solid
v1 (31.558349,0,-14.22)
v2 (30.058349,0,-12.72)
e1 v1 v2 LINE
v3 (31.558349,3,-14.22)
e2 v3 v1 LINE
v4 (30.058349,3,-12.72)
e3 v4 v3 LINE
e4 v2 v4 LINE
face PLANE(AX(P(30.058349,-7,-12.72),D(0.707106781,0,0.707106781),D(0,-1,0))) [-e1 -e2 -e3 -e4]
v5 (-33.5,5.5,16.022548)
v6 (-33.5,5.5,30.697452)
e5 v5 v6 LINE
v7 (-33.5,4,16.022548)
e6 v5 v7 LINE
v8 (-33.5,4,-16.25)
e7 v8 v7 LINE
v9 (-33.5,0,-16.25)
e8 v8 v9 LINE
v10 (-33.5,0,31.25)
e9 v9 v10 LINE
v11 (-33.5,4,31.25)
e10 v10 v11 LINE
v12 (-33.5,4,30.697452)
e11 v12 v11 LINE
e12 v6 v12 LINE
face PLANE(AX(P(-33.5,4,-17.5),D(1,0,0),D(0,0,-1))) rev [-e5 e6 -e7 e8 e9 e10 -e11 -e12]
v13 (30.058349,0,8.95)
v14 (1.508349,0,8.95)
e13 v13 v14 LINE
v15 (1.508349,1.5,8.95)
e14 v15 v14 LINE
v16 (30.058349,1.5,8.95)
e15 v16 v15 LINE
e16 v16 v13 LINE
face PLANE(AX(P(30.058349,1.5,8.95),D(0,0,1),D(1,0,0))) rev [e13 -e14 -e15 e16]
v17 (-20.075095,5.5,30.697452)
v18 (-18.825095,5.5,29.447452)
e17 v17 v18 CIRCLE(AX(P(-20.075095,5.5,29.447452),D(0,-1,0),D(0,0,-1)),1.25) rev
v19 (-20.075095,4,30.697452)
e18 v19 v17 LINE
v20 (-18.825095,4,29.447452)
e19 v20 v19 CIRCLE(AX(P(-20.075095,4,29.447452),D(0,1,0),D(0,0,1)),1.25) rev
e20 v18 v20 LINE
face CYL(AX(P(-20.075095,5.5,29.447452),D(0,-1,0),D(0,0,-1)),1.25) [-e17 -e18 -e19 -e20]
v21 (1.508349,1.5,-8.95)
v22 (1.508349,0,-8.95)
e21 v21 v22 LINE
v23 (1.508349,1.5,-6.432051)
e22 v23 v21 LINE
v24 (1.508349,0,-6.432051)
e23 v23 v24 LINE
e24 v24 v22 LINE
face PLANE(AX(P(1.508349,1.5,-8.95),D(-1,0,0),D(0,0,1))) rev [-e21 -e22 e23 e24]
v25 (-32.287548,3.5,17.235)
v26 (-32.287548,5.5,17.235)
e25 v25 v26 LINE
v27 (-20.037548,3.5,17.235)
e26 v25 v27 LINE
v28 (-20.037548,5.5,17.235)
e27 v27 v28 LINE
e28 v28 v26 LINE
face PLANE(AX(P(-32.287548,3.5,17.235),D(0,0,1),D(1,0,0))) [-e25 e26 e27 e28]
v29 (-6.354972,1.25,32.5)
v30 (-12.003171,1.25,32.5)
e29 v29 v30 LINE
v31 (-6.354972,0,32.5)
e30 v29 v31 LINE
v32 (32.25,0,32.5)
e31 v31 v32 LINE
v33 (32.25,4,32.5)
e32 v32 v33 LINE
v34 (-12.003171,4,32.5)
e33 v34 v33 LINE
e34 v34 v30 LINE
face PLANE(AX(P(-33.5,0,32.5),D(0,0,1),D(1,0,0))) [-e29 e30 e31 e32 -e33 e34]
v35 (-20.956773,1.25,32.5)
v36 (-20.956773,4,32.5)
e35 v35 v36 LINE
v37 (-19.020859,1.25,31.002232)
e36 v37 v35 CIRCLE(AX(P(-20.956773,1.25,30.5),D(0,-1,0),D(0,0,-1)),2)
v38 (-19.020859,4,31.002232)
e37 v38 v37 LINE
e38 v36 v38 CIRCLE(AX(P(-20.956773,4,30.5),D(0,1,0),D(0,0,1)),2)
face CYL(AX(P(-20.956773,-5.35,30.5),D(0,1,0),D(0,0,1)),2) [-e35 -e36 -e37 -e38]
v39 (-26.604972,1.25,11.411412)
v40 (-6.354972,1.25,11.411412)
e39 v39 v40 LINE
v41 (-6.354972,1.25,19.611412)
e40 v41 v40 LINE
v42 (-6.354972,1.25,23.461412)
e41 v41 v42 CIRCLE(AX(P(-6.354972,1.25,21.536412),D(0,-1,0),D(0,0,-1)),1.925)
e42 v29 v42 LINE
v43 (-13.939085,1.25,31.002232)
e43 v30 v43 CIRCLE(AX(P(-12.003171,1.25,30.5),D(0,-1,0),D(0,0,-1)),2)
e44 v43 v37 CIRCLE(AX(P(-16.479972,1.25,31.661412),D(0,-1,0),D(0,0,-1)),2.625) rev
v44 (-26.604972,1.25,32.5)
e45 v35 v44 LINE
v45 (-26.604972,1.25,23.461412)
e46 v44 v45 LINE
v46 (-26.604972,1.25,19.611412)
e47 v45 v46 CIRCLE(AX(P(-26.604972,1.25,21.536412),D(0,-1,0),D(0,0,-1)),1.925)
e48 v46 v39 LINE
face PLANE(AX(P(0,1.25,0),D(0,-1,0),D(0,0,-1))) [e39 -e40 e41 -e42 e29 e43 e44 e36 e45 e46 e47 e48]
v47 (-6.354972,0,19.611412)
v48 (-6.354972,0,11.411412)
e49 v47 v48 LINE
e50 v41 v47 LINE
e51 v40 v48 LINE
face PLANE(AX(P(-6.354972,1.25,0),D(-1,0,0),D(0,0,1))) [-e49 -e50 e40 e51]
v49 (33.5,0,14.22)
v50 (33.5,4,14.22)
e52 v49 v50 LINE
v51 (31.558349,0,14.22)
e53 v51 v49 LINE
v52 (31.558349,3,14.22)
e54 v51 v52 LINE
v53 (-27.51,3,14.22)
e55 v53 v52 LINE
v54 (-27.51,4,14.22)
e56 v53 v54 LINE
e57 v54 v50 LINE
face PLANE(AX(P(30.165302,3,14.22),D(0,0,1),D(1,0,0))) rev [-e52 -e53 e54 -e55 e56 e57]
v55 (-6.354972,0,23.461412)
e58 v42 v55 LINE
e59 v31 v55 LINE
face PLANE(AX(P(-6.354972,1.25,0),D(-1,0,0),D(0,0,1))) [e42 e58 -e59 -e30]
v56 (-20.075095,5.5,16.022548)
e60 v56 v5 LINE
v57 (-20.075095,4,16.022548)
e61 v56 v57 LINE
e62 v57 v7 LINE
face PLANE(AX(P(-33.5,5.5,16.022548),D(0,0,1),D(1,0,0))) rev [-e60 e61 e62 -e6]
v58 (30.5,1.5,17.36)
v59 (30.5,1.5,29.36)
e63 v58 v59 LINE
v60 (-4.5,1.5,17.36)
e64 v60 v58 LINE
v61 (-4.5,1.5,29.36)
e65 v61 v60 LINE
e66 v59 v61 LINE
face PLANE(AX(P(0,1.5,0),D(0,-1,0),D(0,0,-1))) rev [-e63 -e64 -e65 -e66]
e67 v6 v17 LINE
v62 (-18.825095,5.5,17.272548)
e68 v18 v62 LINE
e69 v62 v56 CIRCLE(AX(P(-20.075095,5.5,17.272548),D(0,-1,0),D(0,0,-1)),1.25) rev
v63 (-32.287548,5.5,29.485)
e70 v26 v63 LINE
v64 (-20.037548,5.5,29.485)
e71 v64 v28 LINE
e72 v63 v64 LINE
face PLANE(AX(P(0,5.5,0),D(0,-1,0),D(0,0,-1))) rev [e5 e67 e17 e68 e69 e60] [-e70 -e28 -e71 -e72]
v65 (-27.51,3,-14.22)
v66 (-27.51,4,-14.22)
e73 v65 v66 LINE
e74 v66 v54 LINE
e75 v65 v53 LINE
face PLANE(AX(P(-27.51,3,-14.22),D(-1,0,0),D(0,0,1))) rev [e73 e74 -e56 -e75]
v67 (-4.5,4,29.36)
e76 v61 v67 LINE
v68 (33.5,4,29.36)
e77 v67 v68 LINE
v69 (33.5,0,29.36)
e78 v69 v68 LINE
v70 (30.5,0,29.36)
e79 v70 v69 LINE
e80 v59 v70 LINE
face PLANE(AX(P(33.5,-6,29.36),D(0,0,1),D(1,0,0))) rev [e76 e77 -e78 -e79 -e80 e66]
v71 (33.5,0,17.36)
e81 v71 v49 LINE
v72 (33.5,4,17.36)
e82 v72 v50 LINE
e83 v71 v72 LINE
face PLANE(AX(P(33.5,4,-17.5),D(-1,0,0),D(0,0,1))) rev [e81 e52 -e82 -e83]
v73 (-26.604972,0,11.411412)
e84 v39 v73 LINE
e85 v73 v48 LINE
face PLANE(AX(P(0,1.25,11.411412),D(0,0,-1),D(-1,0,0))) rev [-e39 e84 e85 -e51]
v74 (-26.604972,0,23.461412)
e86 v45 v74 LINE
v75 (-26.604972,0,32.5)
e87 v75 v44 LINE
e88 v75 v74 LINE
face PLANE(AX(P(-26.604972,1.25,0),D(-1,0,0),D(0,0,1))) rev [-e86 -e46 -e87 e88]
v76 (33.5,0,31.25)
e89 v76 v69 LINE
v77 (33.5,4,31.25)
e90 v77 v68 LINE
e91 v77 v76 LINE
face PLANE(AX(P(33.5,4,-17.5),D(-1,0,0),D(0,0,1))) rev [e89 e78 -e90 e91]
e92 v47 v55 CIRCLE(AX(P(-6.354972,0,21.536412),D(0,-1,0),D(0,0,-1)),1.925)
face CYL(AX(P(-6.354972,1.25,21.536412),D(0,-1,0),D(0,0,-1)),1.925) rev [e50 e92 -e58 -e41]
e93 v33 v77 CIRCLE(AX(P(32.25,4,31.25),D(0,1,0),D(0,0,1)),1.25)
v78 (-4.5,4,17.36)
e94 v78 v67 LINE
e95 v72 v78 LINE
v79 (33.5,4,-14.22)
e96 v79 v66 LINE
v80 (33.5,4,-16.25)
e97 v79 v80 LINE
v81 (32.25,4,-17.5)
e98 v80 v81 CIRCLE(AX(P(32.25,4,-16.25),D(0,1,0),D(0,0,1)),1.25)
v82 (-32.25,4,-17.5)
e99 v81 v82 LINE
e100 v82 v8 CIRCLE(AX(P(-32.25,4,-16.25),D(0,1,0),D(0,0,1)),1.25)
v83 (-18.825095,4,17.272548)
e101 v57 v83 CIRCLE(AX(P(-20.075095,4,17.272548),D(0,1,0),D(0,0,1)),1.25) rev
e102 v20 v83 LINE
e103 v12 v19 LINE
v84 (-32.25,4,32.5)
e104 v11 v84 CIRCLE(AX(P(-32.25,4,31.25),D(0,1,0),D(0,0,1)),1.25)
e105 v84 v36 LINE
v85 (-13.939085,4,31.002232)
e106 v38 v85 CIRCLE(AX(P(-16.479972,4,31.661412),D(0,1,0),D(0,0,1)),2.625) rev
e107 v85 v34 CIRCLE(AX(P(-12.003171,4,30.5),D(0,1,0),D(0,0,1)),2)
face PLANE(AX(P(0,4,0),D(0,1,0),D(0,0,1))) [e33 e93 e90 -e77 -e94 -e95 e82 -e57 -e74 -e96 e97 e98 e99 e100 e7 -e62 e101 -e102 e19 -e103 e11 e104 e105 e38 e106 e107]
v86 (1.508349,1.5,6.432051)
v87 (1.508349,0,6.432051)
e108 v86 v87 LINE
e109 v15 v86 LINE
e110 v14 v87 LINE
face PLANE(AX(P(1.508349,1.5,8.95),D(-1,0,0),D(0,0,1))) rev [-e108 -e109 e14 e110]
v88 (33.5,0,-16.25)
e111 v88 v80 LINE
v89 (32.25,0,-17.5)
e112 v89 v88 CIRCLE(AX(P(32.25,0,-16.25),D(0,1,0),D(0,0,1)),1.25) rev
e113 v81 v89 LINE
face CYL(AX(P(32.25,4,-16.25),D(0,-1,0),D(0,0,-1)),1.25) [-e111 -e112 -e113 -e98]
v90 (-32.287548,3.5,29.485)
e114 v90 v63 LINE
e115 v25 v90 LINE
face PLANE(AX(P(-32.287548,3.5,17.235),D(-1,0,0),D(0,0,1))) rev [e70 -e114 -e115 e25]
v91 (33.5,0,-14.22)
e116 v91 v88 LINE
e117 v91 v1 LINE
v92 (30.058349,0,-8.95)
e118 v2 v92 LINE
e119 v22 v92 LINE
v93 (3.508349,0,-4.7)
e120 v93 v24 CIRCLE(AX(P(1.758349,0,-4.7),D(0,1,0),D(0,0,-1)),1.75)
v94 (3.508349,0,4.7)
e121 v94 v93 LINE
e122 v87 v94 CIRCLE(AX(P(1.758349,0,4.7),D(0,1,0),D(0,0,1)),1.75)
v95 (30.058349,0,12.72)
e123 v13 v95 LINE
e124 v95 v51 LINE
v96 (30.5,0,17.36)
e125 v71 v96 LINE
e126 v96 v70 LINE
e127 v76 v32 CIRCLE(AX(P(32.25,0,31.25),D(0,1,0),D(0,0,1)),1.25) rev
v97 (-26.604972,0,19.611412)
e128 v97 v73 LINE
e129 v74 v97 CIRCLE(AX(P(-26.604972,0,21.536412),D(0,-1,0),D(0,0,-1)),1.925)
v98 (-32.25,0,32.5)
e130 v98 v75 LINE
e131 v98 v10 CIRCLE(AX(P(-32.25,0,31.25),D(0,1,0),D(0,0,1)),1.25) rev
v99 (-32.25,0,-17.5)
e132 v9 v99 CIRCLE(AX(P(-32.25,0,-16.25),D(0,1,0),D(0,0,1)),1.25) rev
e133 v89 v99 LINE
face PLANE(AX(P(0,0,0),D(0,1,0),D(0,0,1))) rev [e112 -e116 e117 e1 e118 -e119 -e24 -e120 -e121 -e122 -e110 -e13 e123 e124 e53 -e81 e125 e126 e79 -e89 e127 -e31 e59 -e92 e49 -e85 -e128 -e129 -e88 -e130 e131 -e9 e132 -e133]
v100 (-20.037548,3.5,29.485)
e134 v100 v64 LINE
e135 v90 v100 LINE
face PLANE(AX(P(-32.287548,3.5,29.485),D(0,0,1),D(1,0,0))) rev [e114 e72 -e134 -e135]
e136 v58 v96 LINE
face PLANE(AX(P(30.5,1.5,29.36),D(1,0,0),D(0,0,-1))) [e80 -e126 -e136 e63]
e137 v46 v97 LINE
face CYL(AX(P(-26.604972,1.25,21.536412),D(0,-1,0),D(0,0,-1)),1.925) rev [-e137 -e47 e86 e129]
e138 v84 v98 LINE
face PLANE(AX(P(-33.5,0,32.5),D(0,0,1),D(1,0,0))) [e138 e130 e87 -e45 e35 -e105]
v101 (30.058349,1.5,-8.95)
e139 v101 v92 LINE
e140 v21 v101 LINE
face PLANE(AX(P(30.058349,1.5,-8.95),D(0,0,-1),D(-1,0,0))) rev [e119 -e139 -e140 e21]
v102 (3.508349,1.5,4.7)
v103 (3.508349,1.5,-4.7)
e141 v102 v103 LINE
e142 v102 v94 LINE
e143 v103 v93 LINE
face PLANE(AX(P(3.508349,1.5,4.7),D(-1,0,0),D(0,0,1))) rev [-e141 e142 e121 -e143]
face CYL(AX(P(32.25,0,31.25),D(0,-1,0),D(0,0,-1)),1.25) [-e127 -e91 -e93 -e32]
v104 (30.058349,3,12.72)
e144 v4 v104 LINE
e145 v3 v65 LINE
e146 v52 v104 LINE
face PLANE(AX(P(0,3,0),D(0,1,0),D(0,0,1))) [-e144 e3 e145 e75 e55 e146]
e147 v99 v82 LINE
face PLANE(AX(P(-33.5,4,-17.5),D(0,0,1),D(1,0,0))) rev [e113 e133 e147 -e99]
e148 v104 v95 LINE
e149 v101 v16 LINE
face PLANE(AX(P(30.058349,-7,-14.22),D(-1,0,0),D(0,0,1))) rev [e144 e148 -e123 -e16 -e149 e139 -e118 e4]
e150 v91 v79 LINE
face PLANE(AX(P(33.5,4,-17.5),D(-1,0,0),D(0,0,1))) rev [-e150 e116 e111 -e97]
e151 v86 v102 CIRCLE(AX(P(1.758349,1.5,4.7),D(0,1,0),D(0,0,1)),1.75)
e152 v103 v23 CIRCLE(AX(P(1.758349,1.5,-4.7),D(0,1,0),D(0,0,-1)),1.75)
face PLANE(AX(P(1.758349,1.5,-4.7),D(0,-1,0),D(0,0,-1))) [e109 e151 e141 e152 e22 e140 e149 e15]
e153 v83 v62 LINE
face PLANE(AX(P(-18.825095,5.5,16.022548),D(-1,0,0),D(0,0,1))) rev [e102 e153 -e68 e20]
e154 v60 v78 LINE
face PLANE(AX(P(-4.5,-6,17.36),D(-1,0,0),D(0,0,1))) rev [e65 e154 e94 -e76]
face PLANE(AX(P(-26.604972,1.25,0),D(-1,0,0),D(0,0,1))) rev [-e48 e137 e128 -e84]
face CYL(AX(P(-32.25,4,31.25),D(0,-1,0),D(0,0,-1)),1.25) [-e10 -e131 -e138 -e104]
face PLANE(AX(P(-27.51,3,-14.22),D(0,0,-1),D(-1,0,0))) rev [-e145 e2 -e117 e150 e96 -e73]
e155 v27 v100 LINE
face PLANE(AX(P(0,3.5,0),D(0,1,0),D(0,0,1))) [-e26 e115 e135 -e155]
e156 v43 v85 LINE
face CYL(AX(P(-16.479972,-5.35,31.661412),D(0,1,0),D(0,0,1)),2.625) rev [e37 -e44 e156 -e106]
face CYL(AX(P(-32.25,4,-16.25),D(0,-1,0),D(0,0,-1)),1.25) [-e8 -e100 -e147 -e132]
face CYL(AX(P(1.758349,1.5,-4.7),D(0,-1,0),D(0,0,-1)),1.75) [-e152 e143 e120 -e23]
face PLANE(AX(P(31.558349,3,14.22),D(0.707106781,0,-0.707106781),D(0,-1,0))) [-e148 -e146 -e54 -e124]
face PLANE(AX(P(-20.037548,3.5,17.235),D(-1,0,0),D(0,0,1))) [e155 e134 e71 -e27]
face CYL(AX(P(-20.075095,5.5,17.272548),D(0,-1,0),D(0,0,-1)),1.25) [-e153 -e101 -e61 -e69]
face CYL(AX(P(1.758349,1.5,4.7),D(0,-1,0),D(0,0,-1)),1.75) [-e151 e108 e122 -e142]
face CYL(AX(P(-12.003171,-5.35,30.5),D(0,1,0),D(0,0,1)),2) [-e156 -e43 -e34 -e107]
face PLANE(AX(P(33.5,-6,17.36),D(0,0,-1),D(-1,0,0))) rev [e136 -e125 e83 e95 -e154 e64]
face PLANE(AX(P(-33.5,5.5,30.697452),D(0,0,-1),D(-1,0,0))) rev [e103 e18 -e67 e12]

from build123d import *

# Parameters (mm, degrees)
SKETCH1_W               = 67
SKETCH1_H               = 35
BOSS_EXTRUDE1_DEPTH     = 4
CUT_EXTRUDE1_DEPTH      = 1
SKETCH3_W               = 67
SKETCH3_H               = 15
BOSS_EXTRUDE2_DEPTH     = 4
SKETCH4_W               = 38
SKETCH4_H               = 12
CUT_EXTRUDE2_DEPTH      = 10
SKETCH7_W               = 3.441650955
SKETCH7_H               = 28.44
CUT_EXTRUDE3_DEPTH      = 10
CHAMFER1_SIZE           = 1.5
CUT_EXTRUDE4_DEPTH      = 1.5
SKETCH5_W               = 35
SKETCH5_H               = 12
BOSS_EXTRUDE4_DEPTH     = 1.5
SKETCH9_R               = 1.925
SKETCH9_W               = 20.25
SKETCH9_H               = 20.25
CUT_EXTRUDE5_DEPTH      = 1.25
CUT_EXTRUDE6_DEPTH      = 6.6
CUT_EXTRUDE6_DEPTH_BACK = 6.6
SKETCH10_R              = 2.625
FILLET4_R               = 2
SKETCH11_W              = 12.25
SKETCH11_H              = 12.25
CUT_EXTRUDE8_DEPTH      = 0.5
SKETCH13_W              = 14.674904748
SKETCH13_H              = 14.674904748
SKETCH13_W_2            = 12.25
SKETCH13_H_2            = 12.25
BOSS_EXTRUDE5_DEPTH     = 1.5
FILLET5_R               = 1.25
FILLET6_R               = 1.25
SKETCH14_W              = 20.25
SKETCH14_H              = 1.651849009
CUT_EXTRUDE9_DEPTH      = 1.5


with BuildPart() as part:
    # Sketch1 → Boss-Extrude1 (new body)
    with BuildSketch(Plane(origin=(0, 0, 0), x_dir=(1, 0, 0), z_dir=(0, 1, 0))):
        Rectangle(SKETCH1_W, SKETCH1_H)
    extrude(amount=BOSS_EXTRUDE1_DEPTH)

    # Sketch2 → Cut-Extrude1 (cut)
    with BuildSketch(Plane(origin=(0, 4, 0), x_dir=(1, 0, 0), z_dir=(0, 1, 0))):
        Polygon((-27.51, 14.22), (27.419266745, 14.22), (33.5, 14.22), (33.5, -14.22), (30.165301507, -14.22), (-27.51, -14.22), align=None)
    extrude(amount=-CUT_EXTRUDE1_DEPTH, mode=Mode.SUBTRACT)

    # Sketch3 → Boss-Extrude2 (add)
    with BuildSketch(Plane(origin=(0, 4, 0), x_dir=(1, 0, 0), z_dir=(0, 1, 0))):
        with Locations((0, -25)):
            Rectangle(SKETCH3_W, SKETCH3_H)
    extrude(amount=-BOSS_EXTRUDE2_DEPTH)

    # Sketch4 → Cut-Extrude2 (cut)
    with BuildSketch(Plane(origin=(0, 4, 0), x_dir=(1, 0, 0), z_dir=(0, 1, 0))):
        with Locations((14.5, -23.36)):
            Rectangle(SKETCH4_W, SKETCH4_H)
    extrude(amount=-CUT_EXTRUDE2_DEPTH, mode=Mode.SUBTRACT)

    # Sketch7 → Cut-Extrude3 (cut)
    with BuildSketch(Plane(origin=(0, 3, 0), x_dir=(1, 0, 0), z_dir=(0, 1, 0))):
        with Locations((31.779174522, 0)):
            Rectangle(SKETCH7_W, SKETCH7_H)
    extrude(amount=-CUT_EXTRUDE3_DEPTH, mode=Mode.SUBTRACT)

    # Chamfer1
    chamfer1_edges = [part.edges().sort_by_distance(p)[0] for p in [
        (30.058349045, 1.5, 14.22),
        (30.058349045, 1.5, -14.22),
    ]]
    chamfer(chamfer1_edges, length=CHAMFER1_SIZE)

    # Sketch8 → Cut-Extrude4 (cut)
    with BuildSketch(Plane.XZ):
        with BuildLine():
            Line((30.058349045, 8.95), (1.508349045, 8.95))
            Line((1.508349045, 8.95), (1.508349045, 6.432050808))
            ThreePointArc((1.508349045, 6.432050808), (2.903992969, 6.022875656), (3.508349045, 4.7))
            Line((3.508349045, 4.7), (3.508349045, -4.7))
            ThreePointArc((3.508349045, -4.7), (2.903992969, -6.022875656), (1.508349045, -6.432050808))
            Line((1.508349045, -6.432050808), (1.508349045, -8.95))
            Line((1.508349045, -8.95), (30.058349045, -8.95))
            Line((30.058349045, -8.95), (30.058349045, 8.95))
        make_face()
    extrude(amount=-CUT_EXTRUDE4_DEPTH, mode=Mode.SUBTRACT)

    # Sketch5 → Boss-Extrude4 (add)
    with BuildSketch(Plane.XZ):
        with Locations((13, 23.36)):
            Rectangle(SKETCH5_W, SKETCH5_H)
    extrude(amount=-BOSS_EXTRUDE4_DEPTH)

    # Sketch9 → Cut-Extrude5 (cut)
    with BuildSketch(Plane.XZ):
        with Locations((-6.354971576, 21.536411907)):
            Circle(SKETCH9_R)
        with Locations((-26.604971576, 21.536411907)):
            Circle(SKETCH9_R)
        with Locations((-16.479971576, 21.536411907)):
            Rectangle(SKETCH9_W, SKETCH9_H)
        with BuildLine():
            ThreePointArc((-24.679971576, 21.536411907), (-25.243791022, 22.897592461), (-26.604971576, 23.461411907))
            Line((-26.604971576, 23.461411907), (-26.604971576, 19.611411907))
            ThreePointArc((-26.604971576, 19.611411907), (-25.243791022, 20.175231353), (-24.679971576, 21.536411907))
        make_face()
        with BuildLine():
            Line((-26.604971576, 19.611411907), (-26.604971576, 23.461411907))
            ThreePointArc((-26.604971576, 23.461411907), (-28.529971576, 21.536411907), (-26.604971576, 19.611411907))
        make_face()
        with BuildLine():
            ThreePointArc((-4.429971576, 21.536411907), (-4.993791022, 22.897592461), (-6.354971576, 23.461411907))
            Line((-6.354971576, 23.461411907), (-6.354971576, 19.611411907))
            ThreePointArc((-6.354971576, 19.611411907), (-4.993791022, 20.175231353), (-4.429971576, 21.536411907))
        make_face()
        with BuildLine():
            Line((-6.354971576, 19.611411907), (-6.354971576, 23.461411907))
            ThreePointArc((-6.354971576, 23.461411907), (-8.279971576, 21.536411907), (-6.354971576, 19.611411907))
        make_face()
    extrude(amount=-CUT_EXTRUDE5_DEPTH, mode=Mode.SUBTRACT)

    # Sketch10 → Cut-Extrude6 (cut, two sides: drawn at the far end of the back side and taken through both)
    with BuildSketch(Plane.XZ.offset(-1.25).offset(-CUT_EXTRUDE6_DEPTH_BACK)):
        with Locations((-16.479971576, 31.661411907)):
            Circle(SKETCH10_R)
    extrude(amount=CUT_EXTRUDE6_DEPTH + CUT_EXTRUDE6_DEPTH_BACK, mode=Mode.SUBTRACT)

    # Fillet4
    fillet4_edges = [part.edges().sort_by_distance(p)[0] for p in [
        (-18.967419065, 2, 32.5),
        (-13.992524087, 2, 32.5),
    ]]
    fillet(fillet4_edges, radius=FILLET4_R)

    # Sketch11 → Cut-Extrude8 (cut)
    with BuildSketch(Plane(origin=(0, 4, 0), x_dir=(1, 0, 0), z_dir=(0, 1, 0))):
        with Locations((-26.162547626, -23.36)):
            Rectangle(SKETCH11_W, SKETCH11_H)
    extrude(amount=-CUT_EXTRUDE8_DEPTH, mode=Mode.SUBTRACT)

    # Sketch13 → Boss-Extrude5 (add)
    with BuildSketch(Plane(origin=(0, 4, 0), x_dir=(1, 0, 0), z_dir=(0, 1, 0))):
        with Locations((-26.162547626, -23.36)):
            Rectangle(SKETCH13_W, SKETCH13_H)
        with Locations((-26.162547626, -23.36)):
            Rectangle(SKETCH13_W_2, SKETCH13_H_2, mode=Mode.SUBTRACT)
    extrude(amount=BOSS_EXTRUDE5_DEPTH)

    # Fillet5
    # the kernel refuses this fillet: 1.25 mm, written as the material it takes off along each edge
    with BuildSketch(Plane(origin=(-18.825095252, 4, 16.022547626), x_dir=(0, 0, 1), z_dir=(0, 1, 0)), Plane(origin=(-18.825095252, 4, 30.697452374), x_dir=(-1, 0, 0), z_dir=(0, 1, 0))) as fillet5_piece_1:
        with BuildLine():
            CenterArc((FILLET5_R, -FILLET5_R), FILLET5_R, 90, 90)
            Line((0, -FILLET5_R), (0, 0))
            Line((0, 0), (FILLET5_R, 0))
        make_face()
    extrude(amount=4.625, mode=Mode.SUBTRACT)

    # Fillet6
    fillet6_edges = [part.edges().sort_by_distance(p)[0] for p in [
        (-33.5, 2, 32.5),
        (33.5, 2, 32.5),
        (-33.5, 2, -17.5),
        (33.5, 2, -17.5),
    ]]
    fillet(fillet6_edges, radius=FILLET6_R)

    # Sketch14 → Cut-Extrude9 (cut)
    with BuildSketch(Plane.XZ.offset(-1.25)):
        with Locations((-16.479971576, 32.487336412)):
            Rectangle(SKETCH14_W, SKETCH14_H)
    extrude(amount=CUT_EXTRUDE9_DEPTH, mode=Mode.SUBTRACT)


solid = part.part
